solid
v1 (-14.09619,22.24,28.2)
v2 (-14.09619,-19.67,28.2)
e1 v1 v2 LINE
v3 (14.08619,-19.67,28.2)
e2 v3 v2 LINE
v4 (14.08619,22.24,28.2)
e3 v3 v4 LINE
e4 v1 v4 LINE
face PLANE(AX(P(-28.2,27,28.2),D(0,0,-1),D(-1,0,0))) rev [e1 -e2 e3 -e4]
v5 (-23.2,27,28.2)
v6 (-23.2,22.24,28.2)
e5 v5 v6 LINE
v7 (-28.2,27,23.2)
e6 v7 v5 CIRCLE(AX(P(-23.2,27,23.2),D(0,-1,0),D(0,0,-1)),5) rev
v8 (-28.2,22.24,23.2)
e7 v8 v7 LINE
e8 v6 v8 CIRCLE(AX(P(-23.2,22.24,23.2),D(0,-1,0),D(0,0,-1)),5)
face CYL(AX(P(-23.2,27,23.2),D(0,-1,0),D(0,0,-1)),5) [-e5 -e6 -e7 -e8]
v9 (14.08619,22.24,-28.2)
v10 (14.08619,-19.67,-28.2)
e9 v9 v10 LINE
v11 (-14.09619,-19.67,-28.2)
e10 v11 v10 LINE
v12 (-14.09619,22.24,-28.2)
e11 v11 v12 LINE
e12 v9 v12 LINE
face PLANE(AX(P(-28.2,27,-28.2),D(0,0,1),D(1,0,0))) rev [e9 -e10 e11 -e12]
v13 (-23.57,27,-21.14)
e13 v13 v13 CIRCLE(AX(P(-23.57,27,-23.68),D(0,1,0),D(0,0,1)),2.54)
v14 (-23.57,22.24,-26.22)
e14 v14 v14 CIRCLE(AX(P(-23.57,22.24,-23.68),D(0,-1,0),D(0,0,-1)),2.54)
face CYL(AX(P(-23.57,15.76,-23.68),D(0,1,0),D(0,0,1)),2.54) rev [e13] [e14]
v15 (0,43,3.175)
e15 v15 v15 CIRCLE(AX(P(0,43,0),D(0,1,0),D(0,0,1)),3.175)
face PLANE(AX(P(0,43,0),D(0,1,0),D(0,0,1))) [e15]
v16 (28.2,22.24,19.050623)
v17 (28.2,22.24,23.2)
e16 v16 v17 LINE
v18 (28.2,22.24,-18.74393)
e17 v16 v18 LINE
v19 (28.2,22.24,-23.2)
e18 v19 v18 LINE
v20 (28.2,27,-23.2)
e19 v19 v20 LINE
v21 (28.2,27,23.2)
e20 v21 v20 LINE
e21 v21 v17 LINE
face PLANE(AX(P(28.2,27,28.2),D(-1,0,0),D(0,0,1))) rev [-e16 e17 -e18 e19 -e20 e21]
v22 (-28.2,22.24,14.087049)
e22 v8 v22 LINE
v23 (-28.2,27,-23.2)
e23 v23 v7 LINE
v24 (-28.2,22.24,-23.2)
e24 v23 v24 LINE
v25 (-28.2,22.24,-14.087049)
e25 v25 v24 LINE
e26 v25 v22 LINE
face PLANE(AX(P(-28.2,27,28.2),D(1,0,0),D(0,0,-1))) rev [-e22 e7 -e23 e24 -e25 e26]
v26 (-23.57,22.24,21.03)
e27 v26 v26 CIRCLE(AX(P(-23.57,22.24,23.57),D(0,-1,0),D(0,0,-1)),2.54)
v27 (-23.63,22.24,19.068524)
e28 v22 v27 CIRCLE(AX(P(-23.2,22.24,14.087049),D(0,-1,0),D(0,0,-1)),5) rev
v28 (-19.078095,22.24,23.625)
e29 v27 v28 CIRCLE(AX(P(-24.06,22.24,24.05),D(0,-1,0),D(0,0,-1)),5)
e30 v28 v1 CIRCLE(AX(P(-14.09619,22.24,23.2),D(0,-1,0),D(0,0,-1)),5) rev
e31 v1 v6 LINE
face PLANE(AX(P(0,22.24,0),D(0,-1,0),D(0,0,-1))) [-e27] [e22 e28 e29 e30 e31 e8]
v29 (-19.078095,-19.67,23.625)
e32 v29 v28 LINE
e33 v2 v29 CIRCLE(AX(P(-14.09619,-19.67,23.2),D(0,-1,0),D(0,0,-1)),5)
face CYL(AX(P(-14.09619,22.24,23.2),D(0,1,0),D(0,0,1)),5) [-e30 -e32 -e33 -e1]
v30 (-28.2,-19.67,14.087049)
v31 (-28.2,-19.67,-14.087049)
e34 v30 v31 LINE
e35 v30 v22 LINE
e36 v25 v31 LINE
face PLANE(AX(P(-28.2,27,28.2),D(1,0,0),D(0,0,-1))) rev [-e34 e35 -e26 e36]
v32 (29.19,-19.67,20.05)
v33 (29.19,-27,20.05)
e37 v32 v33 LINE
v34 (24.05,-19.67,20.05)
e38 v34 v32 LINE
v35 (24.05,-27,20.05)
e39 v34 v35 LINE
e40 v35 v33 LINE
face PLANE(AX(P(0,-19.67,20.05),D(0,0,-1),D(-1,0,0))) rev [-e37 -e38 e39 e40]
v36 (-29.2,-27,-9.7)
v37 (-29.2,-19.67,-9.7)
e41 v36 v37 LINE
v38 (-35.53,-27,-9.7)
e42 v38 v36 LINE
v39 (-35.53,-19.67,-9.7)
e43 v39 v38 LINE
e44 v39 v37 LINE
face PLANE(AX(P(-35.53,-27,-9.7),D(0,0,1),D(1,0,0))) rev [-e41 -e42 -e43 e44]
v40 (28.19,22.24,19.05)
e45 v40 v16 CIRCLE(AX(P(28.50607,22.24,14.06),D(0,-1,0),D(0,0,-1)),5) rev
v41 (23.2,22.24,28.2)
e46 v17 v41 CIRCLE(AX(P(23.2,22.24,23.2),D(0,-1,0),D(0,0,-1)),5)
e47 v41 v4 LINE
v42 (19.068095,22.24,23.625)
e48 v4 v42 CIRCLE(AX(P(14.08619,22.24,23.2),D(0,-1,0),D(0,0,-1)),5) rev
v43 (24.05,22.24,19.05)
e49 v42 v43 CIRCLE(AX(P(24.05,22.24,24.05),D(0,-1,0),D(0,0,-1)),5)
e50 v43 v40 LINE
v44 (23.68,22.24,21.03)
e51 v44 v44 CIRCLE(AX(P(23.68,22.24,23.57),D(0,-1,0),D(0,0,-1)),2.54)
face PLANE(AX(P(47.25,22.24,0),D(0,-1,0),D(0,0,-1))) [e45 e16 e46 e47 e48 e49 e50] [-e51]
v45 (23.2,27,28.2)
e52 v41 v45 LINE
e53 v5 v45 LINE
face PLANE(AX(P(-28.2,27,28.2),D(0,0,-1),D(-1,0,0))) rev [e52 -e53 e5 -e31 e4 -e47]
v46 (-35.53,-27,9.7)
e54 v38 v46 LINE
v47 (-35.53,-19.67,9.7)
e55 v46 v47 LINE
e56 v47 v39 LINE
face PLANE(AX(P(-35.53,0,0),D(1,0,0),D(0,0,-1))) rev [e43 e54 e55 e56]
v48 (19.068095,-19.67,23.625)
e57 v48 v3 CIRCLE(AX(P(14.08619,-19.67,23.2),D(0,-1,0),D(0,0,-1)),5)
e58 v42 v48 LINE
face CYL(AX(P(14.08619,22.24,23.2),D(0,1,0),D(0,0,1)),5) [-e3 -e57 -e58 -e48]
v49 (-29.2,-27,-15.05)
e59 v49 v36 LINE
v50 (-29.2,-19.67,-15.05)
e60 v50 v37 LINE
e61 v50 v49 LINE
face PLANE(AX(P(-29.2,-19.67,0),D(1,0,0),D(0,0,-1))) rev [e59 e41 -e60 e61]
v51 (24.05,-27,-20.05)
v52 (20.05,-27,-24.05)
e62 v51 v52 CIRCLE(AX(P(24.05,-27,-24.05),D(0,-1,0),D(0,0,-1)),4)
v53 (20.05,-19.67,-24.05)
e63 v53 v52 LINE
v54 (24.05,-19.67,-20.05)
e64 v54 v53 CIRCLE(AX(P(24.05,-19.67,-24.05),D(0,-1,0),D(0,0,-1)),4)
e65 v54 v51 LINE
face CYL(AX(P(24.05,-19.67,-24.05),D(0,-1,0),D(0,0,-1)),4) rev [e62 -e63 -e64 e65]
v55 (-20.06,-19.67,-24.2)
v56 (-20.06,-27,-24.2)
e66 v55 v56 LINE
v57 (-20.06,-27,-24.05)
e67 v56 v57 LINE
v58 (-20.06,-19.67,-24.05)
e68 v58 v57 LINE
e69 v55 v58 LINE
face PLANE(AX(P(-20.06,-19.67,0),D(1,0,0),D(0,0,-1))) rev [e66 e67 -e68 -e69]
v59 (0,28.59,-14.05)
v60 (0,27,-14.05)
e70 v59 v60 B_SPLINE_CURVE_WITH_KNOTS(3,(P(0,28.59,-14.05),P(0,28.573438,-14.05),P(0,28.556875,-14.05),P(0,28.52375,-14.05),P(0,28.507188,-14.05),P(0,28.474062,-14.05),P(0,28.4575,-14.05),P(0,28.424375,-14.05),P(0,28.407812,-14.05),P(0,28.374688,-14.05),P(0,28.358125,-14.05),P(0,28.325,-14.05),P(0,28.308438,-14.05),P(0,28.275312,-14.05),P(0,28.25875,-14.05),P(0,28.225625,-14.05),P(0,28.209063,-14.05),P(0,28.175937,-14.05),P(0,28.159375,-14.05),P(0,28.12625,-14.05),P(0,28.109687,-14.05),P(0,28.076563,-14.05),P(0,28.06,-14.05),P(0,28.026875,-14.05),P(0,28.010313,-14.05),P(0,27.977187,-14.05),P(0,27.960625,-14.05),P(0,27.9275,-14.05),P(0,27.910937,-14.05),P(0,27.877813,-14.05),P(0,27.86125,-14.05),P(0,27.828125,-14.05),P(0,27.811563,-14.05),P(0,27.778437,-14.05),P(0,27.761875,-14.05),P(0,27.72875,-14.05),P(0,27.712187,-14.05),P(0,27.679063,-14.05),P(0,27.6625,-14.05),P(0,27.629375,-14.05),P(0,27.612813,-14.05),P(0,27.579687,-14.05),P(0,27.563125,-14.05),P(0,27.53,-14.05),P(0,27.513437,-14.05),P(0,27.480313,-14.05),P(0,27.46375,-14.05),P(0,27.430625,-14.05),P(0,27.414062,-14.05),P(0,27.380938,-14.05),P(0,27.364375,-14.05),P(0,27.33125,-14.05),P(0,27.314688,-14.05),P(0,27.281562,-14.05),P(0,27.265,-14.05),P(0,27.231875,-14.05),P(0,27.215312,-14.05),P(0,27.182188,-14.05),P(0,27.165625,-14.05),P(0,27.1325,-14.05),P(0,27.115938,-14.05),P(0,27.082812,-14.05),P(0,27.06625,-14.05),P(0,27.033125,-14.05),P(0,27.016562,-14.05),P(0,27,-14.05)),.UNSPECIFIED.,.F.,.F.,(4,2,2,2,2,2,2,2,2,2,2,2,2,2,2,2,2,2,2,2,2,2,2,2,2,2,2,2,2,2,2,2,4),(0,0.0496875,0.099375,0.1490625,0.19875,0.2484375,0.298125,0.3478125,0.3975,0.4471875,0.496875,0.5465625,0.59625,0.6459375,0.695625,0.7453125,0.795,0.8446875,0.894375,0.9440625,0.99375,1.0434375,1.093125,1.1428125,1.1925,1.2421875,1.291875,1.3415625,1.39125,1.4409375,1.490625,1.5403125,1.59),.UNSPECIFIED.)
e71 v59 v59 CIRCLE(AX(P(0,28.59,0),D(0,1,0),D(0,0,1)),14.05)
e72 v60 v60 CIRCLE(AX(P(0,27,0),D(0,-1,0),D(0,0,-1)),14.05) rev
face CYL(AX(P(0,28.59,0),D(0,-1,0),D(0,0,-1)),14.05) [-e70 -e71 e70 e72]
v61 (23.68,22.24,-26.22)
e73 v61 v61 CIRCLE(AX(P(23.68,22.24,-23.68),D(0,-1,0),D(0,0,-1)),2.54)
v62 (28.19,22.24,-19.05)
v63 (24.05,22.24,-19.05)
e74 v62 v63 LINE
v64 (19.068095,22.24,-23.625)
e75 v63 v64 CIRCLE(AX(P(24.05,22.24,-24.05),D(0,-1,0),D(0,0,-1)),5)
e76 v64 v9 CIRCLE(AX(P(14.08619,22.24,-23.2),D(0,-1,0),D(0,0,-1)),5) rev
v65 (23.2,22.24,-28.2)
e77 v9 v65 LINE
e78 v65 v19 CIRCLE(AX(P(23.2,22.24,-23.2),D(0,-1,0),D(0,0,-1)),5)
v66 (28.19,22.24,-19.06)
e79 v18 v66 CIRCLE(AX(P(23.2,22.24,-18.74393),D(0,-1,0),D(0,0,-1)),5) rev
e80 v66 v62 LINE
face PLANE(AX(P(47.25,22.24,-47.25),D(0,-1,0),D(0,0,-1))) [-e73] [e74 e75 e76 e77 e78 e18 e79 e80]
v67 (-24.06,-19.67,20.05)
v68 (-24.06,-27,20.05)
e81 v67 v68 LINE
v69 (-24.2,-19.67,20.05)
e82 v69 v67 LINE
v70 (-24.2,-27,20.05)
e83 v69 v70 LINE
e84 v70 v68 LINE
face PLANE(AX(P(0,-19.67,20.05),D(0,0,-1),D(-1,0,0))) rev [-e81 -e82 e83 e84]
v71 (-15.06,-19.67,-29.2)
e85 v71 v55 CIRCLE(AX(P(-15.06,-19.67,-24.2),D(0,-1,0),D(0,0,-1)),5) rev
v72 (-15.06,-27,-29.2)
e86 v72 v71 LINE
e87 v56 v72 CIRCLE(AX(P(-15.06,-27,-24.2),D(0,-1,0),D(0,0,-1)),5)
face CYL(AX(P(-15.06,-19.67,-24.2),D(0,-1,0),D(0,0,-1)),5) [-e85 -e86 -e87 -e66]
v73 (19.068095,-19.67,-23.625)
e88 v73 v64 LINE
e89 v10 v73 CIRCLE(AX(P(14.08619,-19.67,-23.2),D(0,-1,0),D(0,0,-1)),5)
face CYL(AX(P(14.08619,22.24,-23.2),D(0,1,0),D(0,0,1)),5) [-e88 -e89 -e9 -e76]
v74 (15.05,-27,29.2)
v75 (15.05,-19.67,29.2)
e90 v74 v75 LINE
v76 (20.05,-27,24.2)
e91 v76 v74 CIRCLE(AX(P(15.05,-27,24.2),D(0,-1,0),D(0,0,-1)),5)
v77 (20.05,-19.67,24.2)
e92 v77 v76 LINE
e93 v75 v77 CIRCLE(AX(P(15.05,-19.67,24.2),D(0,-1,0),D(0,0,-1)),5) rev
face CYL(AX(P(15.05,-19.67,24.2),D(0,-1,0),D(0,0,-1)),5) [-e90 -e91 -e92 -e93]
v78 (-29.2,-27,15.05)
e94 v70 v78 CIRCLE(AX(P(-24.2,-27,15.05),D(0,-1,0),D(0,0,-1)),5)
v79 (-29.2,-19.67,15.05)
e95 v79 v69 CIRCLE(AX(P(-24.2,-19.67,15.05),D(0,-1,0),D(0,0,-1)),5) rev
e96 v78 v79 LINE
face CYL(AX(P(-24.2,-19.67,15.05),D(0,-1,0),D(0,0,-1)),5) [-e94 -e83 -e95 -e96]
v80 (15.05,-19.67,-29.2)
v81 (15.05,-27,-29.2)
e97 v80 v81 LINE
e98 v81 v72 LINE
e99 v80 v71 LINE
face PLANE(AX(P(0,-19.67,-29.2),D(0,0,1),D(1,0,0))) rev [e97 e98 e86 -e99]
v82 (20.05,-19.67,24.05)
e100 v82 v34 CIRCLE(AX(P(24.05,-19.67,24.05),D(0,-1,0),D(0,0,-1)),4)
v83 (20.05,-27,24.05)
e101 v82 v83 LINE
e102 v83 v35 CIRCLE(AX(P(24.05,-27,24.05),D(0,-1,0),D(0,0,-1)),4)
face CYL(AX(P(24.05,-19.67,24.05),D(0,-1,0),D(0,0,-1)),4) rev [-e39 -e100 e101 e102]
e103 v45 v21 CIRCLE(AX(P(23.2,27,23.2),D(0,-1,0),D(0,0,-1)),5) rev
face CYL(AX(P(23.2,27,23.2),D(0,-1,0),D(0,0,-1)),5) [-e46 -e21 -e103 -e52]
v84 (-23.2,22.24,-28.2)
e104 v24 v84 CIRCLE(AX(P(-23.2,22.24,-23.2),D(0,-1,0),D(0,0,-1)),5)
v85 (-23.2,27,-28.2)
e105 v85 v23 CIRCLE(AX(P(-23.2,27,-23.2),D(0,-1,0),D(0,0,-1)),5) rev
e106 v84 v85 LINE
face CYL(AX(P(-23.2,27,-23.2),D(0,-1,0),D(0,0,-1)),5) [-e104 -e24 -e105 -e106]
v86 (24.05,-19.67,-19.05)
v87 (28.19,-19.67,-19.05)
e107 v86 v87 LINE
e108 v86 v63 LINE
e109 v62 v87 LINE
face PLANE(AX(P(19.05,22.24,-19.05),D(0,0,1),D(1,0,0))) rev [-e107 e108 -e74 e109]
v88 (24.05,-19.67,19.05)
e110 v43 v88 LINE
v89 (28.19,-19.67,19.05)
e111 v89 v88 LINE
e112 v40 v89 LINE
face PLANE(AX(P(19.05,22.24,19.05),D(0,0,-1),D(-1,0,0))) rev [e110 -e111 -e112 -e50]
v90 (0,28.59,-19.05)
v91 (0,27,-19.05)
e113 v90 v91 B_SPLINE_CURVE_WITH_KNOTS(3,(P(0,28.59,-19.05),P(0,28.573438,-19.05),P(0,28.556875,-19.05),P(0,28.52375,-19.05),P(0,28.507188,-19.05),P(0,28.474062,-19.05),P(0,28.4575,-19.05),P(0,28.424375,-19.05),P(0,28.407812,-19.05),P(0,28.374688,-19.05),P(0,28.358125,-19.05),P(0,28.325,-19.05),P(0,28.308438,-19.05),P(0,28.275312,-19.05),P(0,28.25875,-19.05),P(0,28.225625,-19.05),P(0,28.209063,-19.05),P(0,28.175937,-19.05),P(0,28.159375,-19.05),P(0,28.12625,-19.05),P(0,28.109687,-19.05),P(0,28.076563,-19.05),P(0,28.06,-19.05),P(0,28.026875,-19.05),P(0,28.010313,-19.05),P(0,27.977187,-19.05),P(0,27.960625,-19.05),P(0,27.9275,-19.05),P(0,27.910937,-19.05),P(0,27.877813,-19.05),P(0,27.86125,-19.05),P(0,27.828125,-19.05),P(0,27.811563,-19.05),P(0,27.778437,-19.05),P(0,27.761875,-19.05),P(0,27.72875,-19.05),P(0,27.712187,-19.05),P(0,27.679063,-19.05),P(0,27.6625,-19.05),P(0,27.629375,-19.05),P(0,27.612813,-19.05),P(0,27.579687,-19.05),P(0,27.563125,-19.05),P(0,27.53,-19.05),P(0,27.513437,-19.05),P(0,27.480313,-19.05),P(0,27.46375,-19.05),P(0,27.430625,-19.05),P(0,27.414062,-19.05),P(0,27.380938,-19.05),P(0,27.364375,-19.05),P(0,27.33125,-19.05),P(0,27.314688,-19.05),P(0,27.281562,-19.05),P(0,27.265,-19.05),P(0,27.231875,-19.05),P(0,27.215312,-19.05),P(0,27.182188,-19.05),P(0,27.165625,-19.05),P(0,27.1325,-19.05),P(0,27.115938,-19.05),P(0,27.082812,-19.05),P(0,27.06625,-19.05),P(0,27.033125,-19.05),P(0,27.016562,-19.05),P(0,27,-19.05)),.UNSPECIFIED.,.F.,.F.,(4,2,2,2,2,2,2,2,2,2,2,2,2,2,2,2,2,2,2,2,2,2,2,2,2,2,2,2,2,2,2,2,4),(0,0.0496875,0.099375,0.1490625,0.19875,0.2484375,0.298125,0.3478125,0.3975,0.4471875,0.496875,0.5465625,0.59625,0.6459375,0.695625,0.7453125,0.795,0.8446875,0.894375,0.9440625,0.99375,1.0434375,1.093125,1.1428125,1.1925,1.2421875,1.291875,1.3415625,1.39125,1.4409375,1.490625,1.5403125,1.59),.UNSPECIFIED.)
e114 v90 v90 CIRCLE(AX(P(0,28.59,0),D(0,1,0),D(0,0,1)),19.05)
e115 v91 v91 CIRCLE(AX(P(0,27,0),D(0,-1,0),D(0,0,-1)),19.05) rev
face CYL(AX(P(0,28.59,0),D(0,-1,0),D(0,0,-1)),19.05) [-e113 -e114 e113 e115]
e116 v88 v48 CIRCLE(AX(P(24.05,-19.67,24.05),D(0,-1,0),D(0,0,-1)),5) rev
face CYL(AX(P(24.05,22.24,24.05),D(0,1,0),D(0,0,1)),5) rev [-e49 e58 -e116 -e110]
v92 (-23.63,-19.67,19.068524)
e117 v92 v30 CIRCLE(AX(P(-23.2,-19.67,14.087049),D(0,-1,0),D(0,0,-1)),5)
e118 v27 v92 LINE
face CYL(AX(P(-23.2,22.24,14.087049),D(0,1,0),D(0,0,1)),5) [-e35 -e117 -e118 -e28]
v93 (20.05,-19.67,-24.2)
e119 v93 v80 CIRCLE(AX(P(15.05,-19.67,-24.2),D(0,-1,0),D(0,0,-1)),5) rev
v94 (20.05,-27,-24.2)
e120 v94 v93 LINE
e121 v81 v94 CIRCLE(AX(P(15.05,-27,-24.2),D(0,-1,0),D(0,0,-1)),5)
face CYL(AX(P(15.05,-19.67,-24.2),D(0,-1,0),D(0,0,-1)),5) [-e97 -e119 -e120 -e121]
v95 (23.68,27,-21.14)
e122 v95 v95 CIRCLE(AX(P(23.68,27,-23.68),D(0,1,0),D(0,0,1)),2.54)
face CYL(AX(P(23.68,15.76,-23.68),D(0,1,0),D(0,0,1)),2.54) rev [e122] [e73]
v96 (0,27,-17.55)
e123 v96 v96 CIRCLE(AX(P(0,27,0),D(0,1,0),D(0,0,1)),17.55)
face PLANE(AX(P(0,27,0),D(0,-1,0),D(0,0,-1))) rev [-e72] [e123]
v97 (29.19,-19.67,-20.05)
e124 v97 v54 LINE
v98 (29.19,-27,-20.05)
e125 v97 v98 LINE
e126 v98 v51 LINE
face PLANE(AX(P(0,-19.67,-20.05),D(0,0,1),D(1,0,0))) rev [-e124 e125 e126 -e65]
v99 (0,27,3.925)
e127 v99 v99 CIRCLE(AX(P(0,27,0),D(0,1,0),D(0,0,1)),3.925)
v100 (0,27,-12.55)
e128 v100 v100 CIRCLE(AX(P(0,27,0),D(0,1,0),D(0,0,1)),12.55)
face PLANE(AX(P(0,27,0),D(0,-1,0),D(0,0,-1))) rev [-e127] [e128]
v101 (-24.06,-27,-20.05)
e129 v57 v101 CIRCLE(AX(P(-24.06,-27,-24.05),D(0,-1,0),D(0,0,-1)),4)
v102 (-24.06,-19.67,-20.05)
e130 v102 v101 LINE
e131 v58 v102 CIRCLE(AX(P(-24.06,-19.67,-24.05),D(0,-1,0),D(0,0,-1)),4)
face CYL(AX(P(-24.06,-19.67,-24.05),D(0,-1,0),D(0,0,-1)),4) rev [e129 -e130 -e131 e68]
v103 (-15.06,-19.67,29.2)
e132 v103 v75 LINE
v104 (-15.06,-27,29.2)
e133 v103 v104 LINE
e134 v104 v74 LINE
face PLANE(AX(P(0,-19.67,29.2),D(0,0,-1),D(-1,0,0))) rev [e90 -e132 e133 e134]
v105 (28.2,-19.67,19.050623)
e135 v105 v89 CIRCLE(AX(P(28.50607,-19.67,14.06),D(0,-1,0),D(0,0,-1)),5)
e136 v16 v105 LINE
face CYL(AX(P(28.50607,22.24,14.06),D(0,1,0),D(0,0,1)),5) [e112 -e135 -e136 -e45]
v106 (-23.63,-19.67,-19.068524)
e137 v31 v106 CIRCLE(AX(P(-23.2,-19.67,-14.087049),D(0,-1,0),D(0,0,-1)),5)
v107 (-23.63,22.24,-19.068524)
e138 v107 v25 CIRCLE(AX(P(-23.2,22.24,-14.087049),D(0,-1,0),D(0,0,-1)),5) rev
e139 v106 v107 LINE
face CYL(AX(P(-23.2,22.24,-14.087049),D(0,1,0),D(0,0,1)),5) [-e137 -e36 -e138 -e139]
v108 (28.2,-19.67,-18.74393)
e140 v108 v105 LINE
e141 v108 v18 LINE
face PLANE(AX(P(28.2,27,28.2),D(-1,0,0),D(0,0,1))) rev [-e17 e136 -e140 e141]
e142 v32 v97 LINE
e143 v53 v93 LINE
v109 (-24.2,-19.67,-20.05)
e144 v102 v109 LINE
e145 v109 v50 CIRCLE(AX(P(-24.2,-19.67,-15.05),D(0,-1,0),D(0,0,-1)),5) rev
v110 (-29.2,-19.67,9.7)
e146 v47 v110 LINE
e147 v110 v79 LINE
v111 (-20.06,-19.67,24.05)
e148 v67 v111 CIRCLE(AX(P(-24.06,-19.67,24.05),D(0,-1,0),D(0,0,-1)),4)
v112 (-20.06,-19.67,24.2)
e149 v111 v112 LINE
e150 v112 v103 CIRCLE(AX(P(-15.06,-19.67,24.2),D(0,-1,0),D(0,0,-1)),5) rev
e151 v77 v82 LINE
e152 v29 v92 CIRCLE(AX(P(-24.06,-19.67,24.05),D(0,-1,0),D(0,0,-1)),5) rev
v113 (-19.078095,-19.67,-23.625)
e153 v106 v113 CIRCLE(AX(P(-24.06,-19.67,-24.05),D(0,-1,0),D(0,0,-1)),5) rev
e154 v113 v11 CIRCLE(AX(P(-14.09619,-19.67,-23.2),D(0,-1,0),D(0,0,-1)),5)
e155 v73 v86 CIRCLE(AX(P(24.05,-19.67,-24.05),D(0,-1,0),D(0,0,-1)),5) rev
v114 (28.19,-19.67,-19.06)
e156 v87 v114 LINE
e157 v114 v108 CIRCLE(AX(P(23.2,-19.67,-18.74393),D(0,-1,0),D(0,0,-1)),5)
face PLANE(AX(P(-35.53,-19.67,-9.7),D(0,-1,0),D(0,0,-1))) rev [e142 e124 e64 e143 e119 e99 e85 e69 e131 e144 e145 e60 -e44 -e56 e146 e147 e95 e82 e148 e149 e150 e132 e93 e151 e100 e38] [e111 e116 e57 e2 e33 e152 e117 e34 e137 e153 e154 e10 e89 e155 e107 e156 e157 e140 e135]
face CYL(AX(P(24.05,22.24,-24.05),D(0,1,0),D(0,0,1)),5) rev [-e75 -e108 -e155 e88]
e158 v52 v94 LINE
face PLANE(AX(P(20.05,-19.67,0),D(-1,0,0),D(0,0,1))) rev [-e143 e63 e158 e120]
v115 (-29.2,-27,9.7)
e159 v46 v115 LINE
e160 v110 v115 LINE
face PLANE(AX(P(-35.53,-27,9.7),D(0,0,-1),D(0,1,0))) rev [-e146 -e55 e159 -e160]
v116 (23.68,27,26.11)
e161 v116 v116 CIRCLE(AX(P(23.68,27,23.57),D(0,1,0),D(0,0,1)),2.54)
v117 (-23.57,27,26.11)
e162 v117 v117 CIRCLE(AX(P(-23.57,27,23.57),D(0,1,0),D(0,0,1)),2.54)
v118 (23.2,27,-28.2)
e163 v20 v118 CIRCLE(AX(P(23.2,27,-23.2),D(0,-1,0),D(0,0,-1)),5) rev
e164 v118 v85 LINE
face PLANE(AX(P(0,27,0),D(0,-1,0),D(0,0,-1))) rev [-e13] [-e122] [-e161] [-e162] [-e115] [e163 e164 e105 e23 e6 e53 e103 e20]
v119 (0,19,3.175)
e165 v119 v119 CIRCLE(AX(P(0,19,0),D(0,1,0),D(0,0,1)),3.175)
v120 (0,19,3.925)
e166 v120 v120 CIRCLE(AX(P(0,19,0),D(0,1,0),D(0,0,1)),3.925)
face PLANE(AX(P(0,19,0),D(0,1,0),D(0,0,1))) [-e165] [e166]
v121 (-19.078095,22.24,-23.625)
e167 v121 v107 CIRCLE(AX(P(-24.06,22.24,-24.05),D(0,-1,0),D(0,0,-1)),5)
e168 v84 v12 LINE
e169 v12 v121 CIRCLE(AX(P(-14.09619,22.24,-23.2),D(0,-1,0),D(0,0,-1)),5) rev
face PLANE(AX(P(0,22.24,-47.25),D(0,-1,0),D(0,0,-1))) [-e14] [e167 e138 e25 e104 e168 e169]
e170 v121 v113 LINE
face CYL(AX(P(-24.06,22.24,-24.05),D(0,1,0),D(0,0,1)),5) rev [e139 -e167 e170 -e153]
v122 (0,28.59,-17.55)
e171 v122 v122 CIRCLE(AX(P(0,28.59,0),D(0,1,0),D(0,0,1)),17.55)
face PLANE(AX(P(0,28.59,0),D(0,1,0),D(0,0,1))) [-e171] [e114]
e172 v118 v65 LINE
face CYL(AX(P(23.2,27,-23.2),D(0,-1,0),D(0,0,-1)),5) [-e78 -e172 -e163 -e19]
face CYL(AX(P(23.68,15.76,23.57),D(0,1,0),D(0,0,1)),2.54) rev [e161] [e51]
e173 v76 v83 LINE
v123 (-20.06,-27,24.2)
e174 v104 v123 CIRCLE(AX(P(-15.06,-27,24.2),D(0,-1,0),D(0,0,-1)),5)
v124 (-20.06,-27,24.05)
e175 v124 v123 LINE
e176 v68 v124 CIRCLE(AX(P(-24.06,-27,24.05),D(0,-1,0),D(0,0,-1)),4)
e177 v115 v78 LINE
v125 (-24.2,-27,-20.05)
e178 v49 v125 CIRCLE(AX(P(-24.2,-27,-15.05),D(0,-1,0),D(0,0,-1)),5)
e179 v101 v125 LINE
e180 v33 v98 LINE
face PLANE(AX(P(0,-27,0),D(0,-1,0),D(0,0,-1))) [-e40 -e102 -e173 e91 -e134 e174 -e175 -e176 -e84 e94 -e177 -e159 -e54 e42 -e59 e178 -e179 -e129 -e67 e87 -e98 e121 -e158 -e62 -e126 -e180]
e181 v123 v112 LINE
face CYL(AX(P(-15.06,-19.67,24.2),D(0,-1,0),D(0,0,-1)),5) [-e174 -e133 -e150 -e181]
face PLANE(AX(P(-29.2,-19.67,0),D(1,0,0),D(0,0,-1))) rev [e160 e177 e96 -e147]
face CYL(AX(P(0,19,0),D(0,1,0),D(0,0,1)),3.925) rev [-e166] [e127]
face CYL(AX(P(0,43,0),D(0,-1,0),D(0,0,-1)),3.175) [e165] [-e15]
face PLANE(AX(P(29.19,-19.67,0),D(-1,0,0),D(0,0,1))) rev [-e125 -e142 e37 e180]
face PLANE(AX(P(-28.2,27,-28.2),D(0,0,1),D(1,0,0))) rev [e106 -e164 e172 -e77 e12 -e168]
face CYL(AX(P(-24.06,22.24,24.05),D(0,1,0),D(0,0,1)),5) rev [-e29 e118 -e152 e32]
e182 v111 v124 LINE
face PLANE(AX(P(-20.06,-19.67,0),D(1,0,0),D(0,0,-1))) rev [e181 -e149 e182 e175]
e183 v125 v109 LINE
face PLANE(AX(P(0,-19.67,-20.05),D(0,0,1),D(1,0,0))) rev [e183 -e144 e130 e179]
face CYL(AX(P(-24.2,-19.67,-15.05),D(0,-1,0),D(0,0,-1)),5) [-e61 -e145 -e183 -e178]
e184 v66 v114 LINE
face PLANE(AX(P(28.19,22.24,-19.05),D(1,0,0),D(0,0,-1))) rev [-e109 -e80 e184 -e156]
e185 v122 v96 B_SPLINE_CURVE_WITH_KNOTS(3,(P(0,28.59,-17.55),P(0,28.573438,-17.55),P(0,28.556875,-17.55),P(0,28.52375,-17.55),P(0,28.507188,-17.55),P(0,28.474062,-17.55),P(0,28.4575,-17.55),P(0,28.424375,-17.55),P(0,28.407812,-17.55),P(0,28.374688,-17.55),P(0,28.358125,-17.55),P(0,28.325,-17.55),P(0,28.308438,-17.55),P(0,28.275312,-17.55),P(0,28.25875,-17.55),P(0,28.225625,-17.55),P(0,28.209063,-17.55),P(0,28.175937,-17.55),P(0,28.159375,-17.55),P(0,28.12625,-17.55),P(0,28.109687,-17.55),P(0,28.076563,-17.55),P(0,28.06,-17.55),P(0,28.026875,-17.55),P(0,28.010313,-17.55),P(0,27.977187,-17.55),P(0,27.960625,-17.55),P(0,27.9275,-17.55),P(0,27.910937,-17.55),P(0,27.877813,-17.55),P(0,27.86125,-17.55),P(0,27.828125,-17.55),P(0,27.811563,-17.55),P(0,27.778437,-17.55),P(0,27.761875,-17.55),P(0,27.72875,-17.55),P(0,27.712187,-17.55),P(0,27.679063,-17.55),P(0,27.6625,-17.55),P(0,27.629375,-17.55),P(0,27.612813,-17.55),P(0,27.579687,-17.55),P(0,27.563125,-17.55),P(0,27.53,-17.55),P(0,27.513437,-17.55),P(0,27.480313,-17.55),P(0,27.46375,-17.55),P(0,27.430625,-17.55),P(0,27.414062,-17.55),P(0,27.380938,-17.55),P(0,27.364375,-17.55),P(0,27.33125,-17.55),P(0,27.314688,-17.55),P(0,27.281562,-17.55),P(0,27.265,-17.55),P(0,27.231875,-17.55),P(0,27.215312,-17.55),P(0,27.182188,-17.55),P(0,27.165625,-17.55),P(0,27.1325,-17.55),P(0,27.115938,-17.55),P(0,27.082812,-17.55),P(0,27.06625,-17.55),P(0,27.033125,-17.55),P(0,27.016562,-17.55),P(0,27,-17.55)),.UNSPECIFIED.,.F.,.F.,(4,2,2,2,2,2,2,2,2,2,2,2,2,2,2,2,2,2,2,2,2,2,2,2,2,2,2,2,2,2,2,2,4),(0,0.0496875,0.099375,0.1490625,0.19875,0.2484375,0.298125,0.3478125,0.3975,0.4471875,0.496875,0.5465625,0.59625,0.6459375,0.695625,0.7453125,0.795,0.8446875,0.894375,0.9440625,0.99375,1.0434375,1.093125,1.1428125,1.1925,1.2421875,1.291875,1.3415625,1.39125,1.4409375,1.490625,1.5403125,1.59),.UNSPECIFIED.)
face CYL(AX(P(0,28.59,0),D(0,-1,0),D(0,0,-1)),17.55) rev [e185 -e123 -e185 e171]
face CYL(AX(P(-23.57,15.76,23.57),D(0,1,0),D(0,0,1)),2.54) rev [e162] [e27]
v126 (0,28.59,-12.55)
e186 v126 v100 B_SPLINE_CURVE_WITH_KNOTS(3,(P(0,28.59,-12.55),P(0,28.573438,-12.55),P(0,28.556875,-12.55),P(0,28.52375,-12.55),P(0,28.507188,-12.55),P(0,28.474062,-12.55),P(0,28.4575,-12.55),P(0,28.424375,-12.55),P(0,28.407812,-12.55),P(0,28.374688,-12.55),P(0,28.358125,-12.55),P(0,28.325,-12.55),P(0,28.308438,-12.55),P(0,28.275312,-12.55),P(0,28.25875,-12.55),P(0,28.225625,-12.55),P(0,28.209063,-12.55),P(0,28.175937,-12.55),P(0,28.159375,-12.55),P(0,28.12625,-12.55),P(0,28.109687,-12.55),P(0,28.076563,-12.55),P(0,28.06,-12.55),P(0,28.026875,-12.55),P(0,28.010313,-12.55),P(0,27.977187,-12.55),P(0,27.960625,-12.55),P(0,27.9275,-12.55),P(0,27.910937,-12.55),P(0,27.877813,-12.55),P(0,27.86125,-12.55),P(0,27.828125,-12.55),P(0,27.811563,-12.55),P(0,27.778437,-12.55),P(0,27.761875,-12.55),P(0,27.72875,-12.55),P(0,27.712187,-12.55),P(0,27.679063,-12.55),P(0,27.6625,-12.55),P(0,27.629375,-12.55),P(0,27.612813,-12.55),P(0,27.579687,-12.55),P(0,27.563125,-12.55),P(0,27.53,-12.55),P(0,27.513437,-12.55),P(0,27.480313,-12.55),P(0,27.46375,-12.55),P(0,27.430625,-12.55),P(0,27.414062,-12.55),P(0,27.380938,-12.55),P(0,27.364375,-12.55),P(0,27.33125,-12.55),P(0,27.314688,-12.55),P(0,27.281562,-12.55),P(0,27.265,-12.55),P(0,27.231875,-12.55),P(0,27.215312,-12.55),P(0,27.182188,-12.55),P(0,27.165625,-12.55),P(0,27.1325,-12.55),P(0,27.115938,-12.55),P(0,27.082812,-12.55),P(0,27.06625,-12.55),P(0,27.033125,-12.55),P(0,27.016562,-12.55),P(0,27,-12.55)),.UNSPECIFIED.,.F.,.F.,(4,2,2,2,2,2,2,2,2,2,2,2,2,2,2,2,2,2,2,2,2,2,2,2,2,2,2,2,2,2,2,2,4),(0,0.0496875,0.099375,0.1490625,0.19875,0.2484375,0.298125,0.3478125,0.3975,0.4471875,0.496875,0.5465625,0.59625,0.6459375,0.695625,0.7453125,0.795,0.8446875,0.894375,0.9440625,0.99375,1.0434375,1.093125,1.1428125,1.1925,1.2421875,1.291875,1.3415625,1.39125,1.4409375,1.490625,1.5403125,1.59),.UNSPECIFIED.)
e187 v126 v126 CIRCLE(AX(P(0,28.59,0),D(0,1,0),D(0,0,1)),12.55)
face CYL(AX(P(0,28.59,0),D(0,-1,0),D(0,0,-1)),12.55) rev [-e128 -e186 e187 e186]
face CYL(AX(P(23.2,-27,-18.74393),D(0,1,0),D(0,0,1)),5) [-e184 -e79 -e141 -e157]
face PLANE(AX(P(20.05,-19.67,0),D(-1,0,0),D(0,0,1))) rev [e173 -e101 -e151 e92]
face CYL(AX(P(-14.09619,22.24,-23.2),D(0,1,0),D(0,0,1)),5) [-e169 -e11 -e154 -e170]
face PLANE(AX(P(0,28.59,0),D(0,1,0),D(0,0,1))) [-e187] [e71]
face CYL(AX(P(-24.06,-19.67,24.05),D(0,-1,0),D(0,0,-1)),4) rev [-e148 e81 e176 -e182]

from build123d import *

# Parameters (mm, degrees)
SKETCH1_W            = 56.4
SKETCH1_H            = 56.4
BOSS_EXTRUDE1_DEPTH  = 27
SKETCH2_R            = 19.05
SKETCH2_R_2          = 17.55
SKETCH2_R_3          = 14.05
SKETCH2_R_4          = 12.55
BOSS_EXTRUDE2_DEPTH  = 1.59
CUT_EXTRUDE1_DEPTH   = 49.24
LPATTERN2_COUNT      = 2
LPATTERN2_PITCH      = 47.25
LPATTERN2_COUNT_DIR2 = 2
LPATTERN2_PITCH_DIR2 = 47.25
SKETCH5_R            = 2.5400000000000027
CUT_EXTRUDE3_DEPTH   = 11.24
LPATTERN3_COUNT      = 2
LPATTERN3_PITCH      = 47.25
LPATTERN3_COUNT_DIR2 = 2
LPATTERN3_PITCH_DIR2 = 47.25
SKETCH6_R            = 3.175
BOSS_EXTRUDE3_DEPTH  = 16
CUT_EXTRUDE4_START   = -8
SKETCH8_R            = 3.925
SKETCH8_R_2          = 3.175
CUT_EXTRUDE4_DEPTH   = 8
FILLET2_R            = 5
BOSS_EXTRUDE5_DEPTH  = 7.33
CUT_EXTRUDE7_DEPTH   = 1
BOSS_EXTRUDE6_START  = -7.33
SKETCH19_W           = 1
SKETCH19_H           = 19.399999999999995
BOSS_EXTRUDE6_DEPTH  = 7.33
FILLET3_R            = 5
FILLET4_R            = 5
FILLET5_R            = 5
FILLET6_R            = 5
FILLET7_R            = 5
FILLET8_R            = 5
FILLET10_R           = 5
FILLET11_R           = 5
FILLET12_R           = 5
FILLET13_R           = 5
FILLET14_R           = 5
FILLET15_R           = 5


with BuildPart() as part:
    # Sketch1 → Boss-Extrude1 (new, symmetric)
    with BuildSketch(Plane(origin=(0, 0, 0), x_dir=(1, 0, 0), z_dir=(0, 1, 0))):
        Rectangle(SKETCH1_W, SKETCH1_H)
    extrude(amount=BOSS_EXTRUDE1_DEPTH, both=True)

    # Sketch2 → Boss-Extrude2 (add)
    # profile 1 of 2: a face of its own
    with BuildSketch(Plane(origin=(0, 27, 0), x_dir=(1, 0, 0), z_dir=(0, 1, 0))):
        with Locations(Location((0, 0, 0), (0, 0, 90))):
            Circle(SKETCH2_R)
        with Locations(Location((0, 0, 0), (0, 0, 90))):
            Circle(SKETCH2_R_2, mode=Mode.SUBTRACT)
    # profile 2 of 2: a face of its own
    with BuildSketch(Plane(origin=(0, 27, 0), x_dir=(1, 0, 0), z_dir=(0, 1, 0))):
        with Locations(Location((0, 0, 0), (0, 0, 90))):
            Circle(SKETCH2_R_3)
        with Locations(Location((0, 0, 0), (0, 0, 90))):
            Circle(SKETCH2_R_4, mode=Mode.SUBTRACT)
    extrude(amount=BOSS_EXTRUDE2_DEPTH)

    # Sketch3 → Cut-Extrude1 (cut)
    with BuildSketch(Plane.XZ.offset(27)):
        Polygon((-28.200000000000006, 28.200000000000003), (-19.060000000000006, 28.200000000000003), (-19.060000000000013, 19.050000000000004), (-28.200000000000014, 19.050000000000004), align=None)
    cut_extrude1 = extrude(amount=-CUT_EXTRUDE1_DEPTH, mode=Mode.SUBTRACT)

    # LPattern2: Cut-Extrude1 2 × 2
    with Locations(*[(i * LPATTERN2_PITCH, 0, -j * LPATTERN2_PITCH_DIR2) for i in range(LPATTERN2_COUNT) for j in range(LPATTERN2_COUNT_DIR2) if (i, j) != (0, 0)]):
        add(cut_extrude1, mode=Mode.SUBTRACT)

    # Sketch5 → Cut-Extrude3 (cut)
    with BuildSketch(Plane(origin=(0, 27, 0), x_dir=(1, 0, 0), z_dir=(0, 1, 0))):
        with Locations(Location((-23.57, -23.57, 0), (0, 0, 270))):
            Circle(SKETCH5_R)
    cut_extrude3 = extrude(amount=-CUT_EXTRUDE3_DEPTH, mode=Mode.SUBTRACT)

    # LPattern3: Cut-Extrude3 2 × 2
    with Locations(*[(i * LPATTERN3_PITCH, 0, -j * LPATTERN3_PITCH_DIR2) for i in range(LPATTERN3_COUNT) for j in range(LPATTERN3_COUNT_DIR2) if (i, j) != (0, 0)]):
        add(cut_extrude3, mode=Mode.SUBTRACT)

    # Sketch6 → Boss-Extrude3 (add)
    with BuildSketch(Plane(origin=(0, 27, 0), x_dir=(1, 0, 0), z_dir=(0, 1, 0))):
        with Locations(Location((0, 0, 0), (0, 0, 90))):
            Circle(SKETCH6_R)
    extrude(amount=BOSS_EXTRUDE3_DEPTH)

    # Sketch8 → Cut-Extrude4 (cut)
    with BuildSketch(Plane(origin=(0, 27, 0), x_dir=(1, 0, 0), z_dir=(0, 1, 0)).offset(CUT_EXTRUDE4_START)):
        with Locations(Location((0, 0, 0), (0, 0, 270))):
            Circle(SKETCH8_R)
        with Locations(Location((0, 0, 0), (0, 0, 270))):
            Circle(SKETCH8_R_2, mode=Mode.SUBTRACT)
    extrude(amount=CUT_EXTRUDE4_DEPTH, mode=Mode.SUBTRACT)

    # Fillet2
    fillet2_edges = [part.edges().sort_by_distance(p)[0] for p in [
        (-19.060000000000013, -2.379999999999999, 19.050000000000004),
        (-19.060000000000006, -2.379999999999999, -19.049999999999997),
        (19.049999999999986, -2.379999999999999, 19.050000000000004),
        (19.049999999999994, -2.379999999999999, -19.049999999999997),
    ]]
    fillet(fillet2_edges, radius=FILLET2_R)

    # Sketch9 → Boss-Extrude5 (add)
    with BuildSketch(Plane.ZY.offset(28.200000000000006)):
        Polygon((-9.699999999999996, -27.000000000000014), (9.7, -27.00000000000001), (9.700000000000003, -19.67), (-9.699999999999996, -19.670000000000005), align=None)
    extrude(amount=BOSS_EXTRUDE5_DEPTH)

    # Sketch17 → Cut-Extrude7 (cut)
    with BuildSketch(Plane(origin=(28.199999999999992, 0, 0), x_dir=(0, 0, -1), z_dir=(1, 0, 0))):
        Polygon((-28.200000000000003, -27), (-19.060000000000002, -27), (-19.060000000000002, 22.24), (-28.200000000000017, 22.24), align=None)
        Polygon((28.199999999999996, -27), (19.059999999999988, -27), (19.05999999999999, 22.24), (28.19999999999999, 22.24), align=None)
    extrude(amount=-CUT_EXTRUDE7_DEPTH, mode=Mode.SUBTRACT)

    # Sketch19 → Boss-Extrude6 (add)
    with BuildSketch(Plane.XZ.offset(27).offset(BOSS_EXTRUDE6_START)):
        with BuildLine():
            Line((-28.200000000000006, 9.700000000000001), (-28.200000000000014, 19.050000000000004))
            Line((-28.200000000000014, 19.050000000000004), (-24.060000000000013, 19.050000000000004))
            ThreePointArc((-24.060000000000013, 19.050000000000004), (-20.524466094067275, 20.514466094067267), (-19.060000000000006, 24.05))
            Line((-19.06000000000001, 24.05), (-19.060000000000006, 28.200000000000003))
            Line((-19.060000000000006, 28.200000000000003), (19.049999999999994, 28.200000000000003))
            Line((19.049999999999994, 28.200000000000003), (19.04999999999999, 24.050000000000008))
            ThreePointArc((19.04999999999999, 24.050000000000008), (20.514466094067252, 20.51446609406727), (24.04999999999999, 19.050000000000004))
            Line((24.04999999999999, 19.050000000000004), (28.189999999999987, 19.050000000000004))
            Line((28.189999999999987, 19.050000000000004), (28.18999999999999, 19.060000000000002))
            Line((28.18999999999999, 19.060000000000002), (28.199999999999992, 19.060000000000002))
            Line((28.199999999999992, 19.060000000000002), (28.199999999999992, -19.059999999999988))
            Line((28.199999999999992, -19.059999999999988), (28.19, -19.059999999999988))
            Line((28.19, -19.059999999999988), (28.19, -19.049999999999997))
            Line((28.19, -19.049999999999997), (24.049999999999997, -19.049999999999997))
            ThreePointArc((24.049999999999997, -19.049999999999997), (20.51446609406726, -20.51446609406726), (19.049999999999997, -24.049999999999994))
            Line((19.049999999999997, -24.049999999999994), (19.049999999999994, -28.199999999999996))
            Line((19.049999999999994, -28.199999999999996), (-19.060000000000006, -28.199999999999996))
            Line((-19.060000000000006, -28.199999999999996), (-19.060000000000002, -24.05))
            ThreePointArc((-19.060000000000002, -24.05), (-20.524466094067265, -20.51446609406726), (-24.060000000000006, -19.049999999999997))
            Line((-24.060000000000006, -19.049999999999997), (-28.2, -19.049999999999997))
            Line((-28.2, -19.049999999999997), (-28.200000000000006, -9.699999999999994))
            Line((-28.200000000000006, -9.699999999999994), (-29.200000000000006, -9.699999999999994))
            Line((-29.200000000000006, -9.699999999999994), (-29.2, -20.049999999999997))
            Line((-29.2, -20.049999999999997), (-24.060000000000006, -20.049999999999997))
            ThreePointArc((-24.060000000000006, -20.049999999999997), (-21.231572875253814, -21.22157287525381), (-20.060000000000006, -24.05))
            Line((-20.060000000000006, -24.05), (-20.060000000000013, -29.199999999999996))
            Line((-20.060000000000016, -29.199999999999996), (20.049999999999997, -29.199999999999996))
            Line((20.049999999999997, -29.199999999999996), (20.049999999999997, -24.049999999999994))
            ThreePointArc((20.049999999999997, -24.049999999999994), (21.22157287525381, -21.221572875253806), (24.049999999999997, -20.049999999999997))
            Line((24.049999999999997, -20.049999999999997), (29.189999999999987, -20.049999999999997))
            Line((29.189999999999987, -20.049999999999997), (29.189999999999994, 20.050000000000004))
            Line((29.189999999999994, 20.050000000000004), (24.04999999999999, 20.050000000000004))
            ThreePointArc((24.04999999999999, 20.050000000000004), (21.2215728752538, 21.221572875253816), (20.04999999999999, 24.050000000000008))
            Line((20.04999999999999, 24.050000000000008), (20.049999999999986, 29.200000000000006))
            Line((20.049999999999986, 29.200000000000006), (-20.060000000000006, 29.200000000000003))
            Line((-20.060000000000006, 29.200000000000003), (-20.060000000000006, 24.05))
            ThreePointArc((-20.060000000000006, 24.05), (-21.23157287525382, 21.221572875253813), (-24.060000000000013, 20.050000000000004))
            Line((-24.060000000000013, 20.050000000000004), (-29.200000000000014, 20.050000000000004))
            Line((-29.200000000000014, 20.050000000000004), (-29.200000000000006, 9.700000000000001))
            Line((-29.200000000000006, 9.700000000000001), (-28.200000000000006, 9.700000000000001))
        make_face()
        with Locations((-28.700000000000006, 3.55e-15)):
            Rectangle(SKETCH19_W, SKETCH19_H)
    extrude(amount=BOSS_EXTRUDE6_DEPTH)

    # Fillet3
    fillet3_edges = [part.edges().sort_by_distance(p)[0] for p in [
        (28.199999999999992, 24.619999999999997, 28.200000000000003),
        (-28.200000000000006, 24.62, 28.200000000000003),
        (-28.200000000000006, 24.62, -28.199999999999996),
        (28.199999999999992, 24.619999999999997, -28.199999999999996),
    ]]
    fillet(fillet3_edges, radius=FILLET3_R)

    # Fillet4
    # the kernel refuses this fillet: 5 mm, written as the material it takes off along each edge
    with BuildSketch(Plane(origin=(28.189999999999987, 22.239999999999995, 19.060000000000002), x_dir=(-7.1e-16, 0, -1), z_dir=(0, -1, 0))) as fillet4_piece_1_section:
        with BuildLine():
            CenterArc((FILLET4_R, FILLET4_R), FILLET4_R, 180.00000000000003, 90)
            Line((-3.55e-15, FILLET4_R), (0, 0))
            Line((0, 0), (FILLET4_R, 0))
        make_face()
    fillet4_piece_1 = extrude(amount=41.91, mode=Mode.PRIVATE)
    fillet4_piece_1 = split(fillet4_piece_1, bisect_by=Plane(origin=(28.194999999999993, 1.2849999999999966, 19.050000000000004), z_dir=(0, 0, 1)), keep=Keep.TOP, mode=Mode.PRIVATE)
    add(fillet4_piece_1, mode=Mode.SUBTRACT)
    with BuildSketch(Plane(origin=(19.049999999999994, -19.67, 28.200000000000003), x_dir=(-1, 0, 0), z_dir=(0, 1, 0))) as fillet4_piece_2:
        with BuildLine():
            CenterArc((4.96380951243048, -5), FILLET4_R, 90, 85.12397513038704)
            Line((-0.01809524378475658, -4.574999999999999), (-0.5162857194062802, -4.532499999999999))
            ThreePointArc((-0.5162857194062802, -4.532499999999999), (-0.49999999999999645, -4.149999999999995), (-0.5, 0))
            Line((-0.5, 0), (0, 0.5))
            Line((0, 0.5), (4.96380951243048, 0.5))
            Line((4.96380951243048, 0.5), (4.96380951243048, 0))
        make_face()
    extrude(amount=41.910000000000004, mode=Mode.SUBTRACT)
    with BuildSketch(Plane(origin=(-19.060000000000006, -19.67, 28.200000000000003), x_dir=(1, 0, 0), z_dir=(0, 1, 0))) as fillet4_piece_3:
        with BuildLine():
            CenterArc((4.963809512430471, 5), FILLET4_R, 184.87602486961296, 85.12397513038707)
            Line((-0.01809524378476723, 4.574999999999999), (-0.5162857194062909, 4.532499999999999))
            ThreePointArc((-0.5162857194062909, 4.532499999999999), (-0.5000000000000036, 4.150000000000002), (-0.5, 0))
            Line((-0.5, 0), (0, -0.5))
            Line((0, -0.5), (4.963809512430471, -0.5))
            Line((4.963809512430471, -0.5), (4.963809512430471, 0))
        make_face()
    extrude(amount=41.910000000000004, mode=Mode.SUBTRACT)
    with BuildSketch(Plane(origin=(-28.200000000000014, -19.67, 19.050000000000004), x_dir=(1.43e-15, 0, -1), z_dir=(0, 1, 0))) as fillet4_piece_4:
        with BuildLine():
            CenterArc((4.962951369950581, -5), FILLET4_R, 90.00000000000009, 85.06646876992886)
            Line((-0.01852431502470665, -4.570000000000004), (-0.5166718835222361, -4.5270000000000055))
            ThreePointArc((-0.5166718835222361, -4.5270000000000055), (-0.49999999999999406, -4.1400000000000015), (-0.5, -7.2e-16))
            Line((-0.5, -7.2e-16), (-7.2e-16, 0.5))
            Line((-7.2e-16, 0.5), (4.962951369950573, 0.5))
            Line((4.962951369950573, 0.5), (4.962951369950574, 0))
        make_face()
    extrude(amount=41.910000000000004, mode=Mode.SUBTRACT)

    # Fillet5
    # the kernel refuses this fillet: 5 mm, written as the material it takes off along each edge
    with BuildSketch(Plane(origin=(19.049999999999986, -19.67, -28.199999999999996), x_dir=(0.003955213605638994, 0, 0.999992178112076), z_dir=(0, 1, 0))) as fillet5_piece_1:
        with BuildLine():
            CenterArc((4.980327963641015, -4.983546754096982), FILLET5_R, 94.64940723207758, 85.12397513038707)
            Line((-0.01963292691936526, -4.963770686068789), (-0.5196290159754032, -4.961793079265969))
            Line((-0.5196290159754032, -4.961793079265969), (-0.499996089056038, 0.0019776068028195))
            Line((-0.499996089056038, 0.0019776068028195), (0.0019776068028195, 0.499996089056038))
            ThreePointArc((0.0019776068028195, 0.499996089056038), (4.151945145967937, 0.4835819525926397), (4.534506567594776, 0.4983546754096982))
            Line((4.534506567594776, 0.4983546754096982), (4.575035785417161, 0))
        make_face()
    extrude(amount=41.910000000000004, mode=Mode.SUBTRACT)

    # Fillet6
    # the kernel refuses this fillet: 5 mm, written as the material it takes off along each edge
    with BuildSketch(Plane(origin=(28.199999999999992, -19.67, -19.059999999999988), x_dir=(-1, 0, 0), z_dir=(0, 1, -7e-17))) as fillet6_piece_1:
        with BuildLine():
            CenterArc((5, 0.3160696125855509), FILLET6_R, 180, 3.624307494007553)
            Line((0, 0.3160696125855509), (0, 0))
            Line((0, 0), (0.00999999999999801, 0))
        make_face()
    extrude(amount=41.91, mode=Mode.SUBTRACT)

    # Fillet7
    # the kernel refuses this fillet: 5 mm, written as the material it takes off along each edge
    with BuildSketch(Plane(origin=(-28.200000000000006, -19.67, -19.049999999999997), x_dir=(0.9999917848297434, 0, -0.004053427318230063), z_dir=(0, 1, 0))) as fillet7_piece_1:
        with BuildLine():
            CenterArc((4.979841961486708, -4.983177735051244), FILLET7_R, 94.70128631619599, 85.06646876992889)
            Line((-0.02011696266200852, -4.962910598460094), (-0.5201128550768802, -4.960883884800979))
            Line((-0.5201128550768802, -4.960883884800979), (-0.4999958924148717, 0.00202671365911503))
            Line((-0.4999958924148717, 0.00202671365911503), (0.00202671365911503, 0.4999958924148717))
            ThreePointArc((0.00202671365911503, 0.4999958924148717), (4.141992702854253, 0.48321470331739924), (4.5290571018514765, 0.49831777350512513))
            Line((4.5290571018514765, 0.49831777350512513), (4.570037543636496, 0))
        make_face()
    extrude(amount=41.910000000000004, mode=Mode.SUBTRACT)

    # Fillet8
    # the kernel refuses this fillet: 5 mm, written as the material it takes off along each edge
    with BuildSketch(Plane(origin=(-19.060000000000013, -19.67, -28.199999999999996), x_dir=(1, 0, 0), z_dir=(0, 1, 0))) as fillet8_piece_1:
        with BuildLine():
            CenterArc((4.96380951243048, -5), FILLET8_R, 90, 85.12397513038704)
            Line((-0.01809524378475658, -4.574999999999999), (-0.5162857194062802, -4.532499999999999))
            ThreePointArc((-0.5162857194062802, -4.532499999999999), (-0.49999999999999645, -4.149999999999995), (-0.5, 0))
            Line((-0.5, 0), (0, 0.5))
            Line((0, 0.5), (4.96380951243048, 0.5))
            Line((4.96380951243048, 0.5), (4.96380951243048, 0))
        make_face()
    extrude(amount=41.910000000000004, mode=Mode.SUBTRACT)

    # Fillet10
    fillet10_edges = [part.edges().sort_by_distance(p)[0] for p in [
        (-20.060000000000006, -23.335, 29.200000000000003),
    ]]
    fillet(fillet10_edges, radius=FILLET10_R)

    # Fillet11
    fillet11_edges = [part.edges().sort_by_distance(p)[0] for p in [
        (-29.200000000000014, -23.335, 20.050000000000004),
    ]]
    fillet(fillet11_edges, radius=FILLET11_R)

    # Fillet12
    fillet12_edges = [part.edges().sort_by_distance(p)[0] for p in [
        (-29.2, -23.335, -20.049999999999997),
    ]]
    fillet(fillet12_edges, radius=FILLET12_R)

    # Fillet13
    fillet13_edges = [part.edges().sort_by_distance(p)[0] for p in [
        (-20.060000000000016, -23.335, -29.199999999999996),
    ]]
    fillet(fillet13_edges, radius=FILLET13_R)

    # Fillet14
    fillet14_edges = [part.edges().sort_by_distance(p)[0] for p in [
        (20.049999999999997, -23.335, -29.199999999999996),
    ]]
    fillet(fillet14_edges, radius=FILLET14_R)

    # Fillet15
    fillet15_edges = [part.edges().sort_by_distance(p)[0] for p in [
        (20.049999999999986, -23.335, 29.200000000000006),
    ]]
    fillet(fillet15_edges, radius=FILLET15_R)


solid = part.part
